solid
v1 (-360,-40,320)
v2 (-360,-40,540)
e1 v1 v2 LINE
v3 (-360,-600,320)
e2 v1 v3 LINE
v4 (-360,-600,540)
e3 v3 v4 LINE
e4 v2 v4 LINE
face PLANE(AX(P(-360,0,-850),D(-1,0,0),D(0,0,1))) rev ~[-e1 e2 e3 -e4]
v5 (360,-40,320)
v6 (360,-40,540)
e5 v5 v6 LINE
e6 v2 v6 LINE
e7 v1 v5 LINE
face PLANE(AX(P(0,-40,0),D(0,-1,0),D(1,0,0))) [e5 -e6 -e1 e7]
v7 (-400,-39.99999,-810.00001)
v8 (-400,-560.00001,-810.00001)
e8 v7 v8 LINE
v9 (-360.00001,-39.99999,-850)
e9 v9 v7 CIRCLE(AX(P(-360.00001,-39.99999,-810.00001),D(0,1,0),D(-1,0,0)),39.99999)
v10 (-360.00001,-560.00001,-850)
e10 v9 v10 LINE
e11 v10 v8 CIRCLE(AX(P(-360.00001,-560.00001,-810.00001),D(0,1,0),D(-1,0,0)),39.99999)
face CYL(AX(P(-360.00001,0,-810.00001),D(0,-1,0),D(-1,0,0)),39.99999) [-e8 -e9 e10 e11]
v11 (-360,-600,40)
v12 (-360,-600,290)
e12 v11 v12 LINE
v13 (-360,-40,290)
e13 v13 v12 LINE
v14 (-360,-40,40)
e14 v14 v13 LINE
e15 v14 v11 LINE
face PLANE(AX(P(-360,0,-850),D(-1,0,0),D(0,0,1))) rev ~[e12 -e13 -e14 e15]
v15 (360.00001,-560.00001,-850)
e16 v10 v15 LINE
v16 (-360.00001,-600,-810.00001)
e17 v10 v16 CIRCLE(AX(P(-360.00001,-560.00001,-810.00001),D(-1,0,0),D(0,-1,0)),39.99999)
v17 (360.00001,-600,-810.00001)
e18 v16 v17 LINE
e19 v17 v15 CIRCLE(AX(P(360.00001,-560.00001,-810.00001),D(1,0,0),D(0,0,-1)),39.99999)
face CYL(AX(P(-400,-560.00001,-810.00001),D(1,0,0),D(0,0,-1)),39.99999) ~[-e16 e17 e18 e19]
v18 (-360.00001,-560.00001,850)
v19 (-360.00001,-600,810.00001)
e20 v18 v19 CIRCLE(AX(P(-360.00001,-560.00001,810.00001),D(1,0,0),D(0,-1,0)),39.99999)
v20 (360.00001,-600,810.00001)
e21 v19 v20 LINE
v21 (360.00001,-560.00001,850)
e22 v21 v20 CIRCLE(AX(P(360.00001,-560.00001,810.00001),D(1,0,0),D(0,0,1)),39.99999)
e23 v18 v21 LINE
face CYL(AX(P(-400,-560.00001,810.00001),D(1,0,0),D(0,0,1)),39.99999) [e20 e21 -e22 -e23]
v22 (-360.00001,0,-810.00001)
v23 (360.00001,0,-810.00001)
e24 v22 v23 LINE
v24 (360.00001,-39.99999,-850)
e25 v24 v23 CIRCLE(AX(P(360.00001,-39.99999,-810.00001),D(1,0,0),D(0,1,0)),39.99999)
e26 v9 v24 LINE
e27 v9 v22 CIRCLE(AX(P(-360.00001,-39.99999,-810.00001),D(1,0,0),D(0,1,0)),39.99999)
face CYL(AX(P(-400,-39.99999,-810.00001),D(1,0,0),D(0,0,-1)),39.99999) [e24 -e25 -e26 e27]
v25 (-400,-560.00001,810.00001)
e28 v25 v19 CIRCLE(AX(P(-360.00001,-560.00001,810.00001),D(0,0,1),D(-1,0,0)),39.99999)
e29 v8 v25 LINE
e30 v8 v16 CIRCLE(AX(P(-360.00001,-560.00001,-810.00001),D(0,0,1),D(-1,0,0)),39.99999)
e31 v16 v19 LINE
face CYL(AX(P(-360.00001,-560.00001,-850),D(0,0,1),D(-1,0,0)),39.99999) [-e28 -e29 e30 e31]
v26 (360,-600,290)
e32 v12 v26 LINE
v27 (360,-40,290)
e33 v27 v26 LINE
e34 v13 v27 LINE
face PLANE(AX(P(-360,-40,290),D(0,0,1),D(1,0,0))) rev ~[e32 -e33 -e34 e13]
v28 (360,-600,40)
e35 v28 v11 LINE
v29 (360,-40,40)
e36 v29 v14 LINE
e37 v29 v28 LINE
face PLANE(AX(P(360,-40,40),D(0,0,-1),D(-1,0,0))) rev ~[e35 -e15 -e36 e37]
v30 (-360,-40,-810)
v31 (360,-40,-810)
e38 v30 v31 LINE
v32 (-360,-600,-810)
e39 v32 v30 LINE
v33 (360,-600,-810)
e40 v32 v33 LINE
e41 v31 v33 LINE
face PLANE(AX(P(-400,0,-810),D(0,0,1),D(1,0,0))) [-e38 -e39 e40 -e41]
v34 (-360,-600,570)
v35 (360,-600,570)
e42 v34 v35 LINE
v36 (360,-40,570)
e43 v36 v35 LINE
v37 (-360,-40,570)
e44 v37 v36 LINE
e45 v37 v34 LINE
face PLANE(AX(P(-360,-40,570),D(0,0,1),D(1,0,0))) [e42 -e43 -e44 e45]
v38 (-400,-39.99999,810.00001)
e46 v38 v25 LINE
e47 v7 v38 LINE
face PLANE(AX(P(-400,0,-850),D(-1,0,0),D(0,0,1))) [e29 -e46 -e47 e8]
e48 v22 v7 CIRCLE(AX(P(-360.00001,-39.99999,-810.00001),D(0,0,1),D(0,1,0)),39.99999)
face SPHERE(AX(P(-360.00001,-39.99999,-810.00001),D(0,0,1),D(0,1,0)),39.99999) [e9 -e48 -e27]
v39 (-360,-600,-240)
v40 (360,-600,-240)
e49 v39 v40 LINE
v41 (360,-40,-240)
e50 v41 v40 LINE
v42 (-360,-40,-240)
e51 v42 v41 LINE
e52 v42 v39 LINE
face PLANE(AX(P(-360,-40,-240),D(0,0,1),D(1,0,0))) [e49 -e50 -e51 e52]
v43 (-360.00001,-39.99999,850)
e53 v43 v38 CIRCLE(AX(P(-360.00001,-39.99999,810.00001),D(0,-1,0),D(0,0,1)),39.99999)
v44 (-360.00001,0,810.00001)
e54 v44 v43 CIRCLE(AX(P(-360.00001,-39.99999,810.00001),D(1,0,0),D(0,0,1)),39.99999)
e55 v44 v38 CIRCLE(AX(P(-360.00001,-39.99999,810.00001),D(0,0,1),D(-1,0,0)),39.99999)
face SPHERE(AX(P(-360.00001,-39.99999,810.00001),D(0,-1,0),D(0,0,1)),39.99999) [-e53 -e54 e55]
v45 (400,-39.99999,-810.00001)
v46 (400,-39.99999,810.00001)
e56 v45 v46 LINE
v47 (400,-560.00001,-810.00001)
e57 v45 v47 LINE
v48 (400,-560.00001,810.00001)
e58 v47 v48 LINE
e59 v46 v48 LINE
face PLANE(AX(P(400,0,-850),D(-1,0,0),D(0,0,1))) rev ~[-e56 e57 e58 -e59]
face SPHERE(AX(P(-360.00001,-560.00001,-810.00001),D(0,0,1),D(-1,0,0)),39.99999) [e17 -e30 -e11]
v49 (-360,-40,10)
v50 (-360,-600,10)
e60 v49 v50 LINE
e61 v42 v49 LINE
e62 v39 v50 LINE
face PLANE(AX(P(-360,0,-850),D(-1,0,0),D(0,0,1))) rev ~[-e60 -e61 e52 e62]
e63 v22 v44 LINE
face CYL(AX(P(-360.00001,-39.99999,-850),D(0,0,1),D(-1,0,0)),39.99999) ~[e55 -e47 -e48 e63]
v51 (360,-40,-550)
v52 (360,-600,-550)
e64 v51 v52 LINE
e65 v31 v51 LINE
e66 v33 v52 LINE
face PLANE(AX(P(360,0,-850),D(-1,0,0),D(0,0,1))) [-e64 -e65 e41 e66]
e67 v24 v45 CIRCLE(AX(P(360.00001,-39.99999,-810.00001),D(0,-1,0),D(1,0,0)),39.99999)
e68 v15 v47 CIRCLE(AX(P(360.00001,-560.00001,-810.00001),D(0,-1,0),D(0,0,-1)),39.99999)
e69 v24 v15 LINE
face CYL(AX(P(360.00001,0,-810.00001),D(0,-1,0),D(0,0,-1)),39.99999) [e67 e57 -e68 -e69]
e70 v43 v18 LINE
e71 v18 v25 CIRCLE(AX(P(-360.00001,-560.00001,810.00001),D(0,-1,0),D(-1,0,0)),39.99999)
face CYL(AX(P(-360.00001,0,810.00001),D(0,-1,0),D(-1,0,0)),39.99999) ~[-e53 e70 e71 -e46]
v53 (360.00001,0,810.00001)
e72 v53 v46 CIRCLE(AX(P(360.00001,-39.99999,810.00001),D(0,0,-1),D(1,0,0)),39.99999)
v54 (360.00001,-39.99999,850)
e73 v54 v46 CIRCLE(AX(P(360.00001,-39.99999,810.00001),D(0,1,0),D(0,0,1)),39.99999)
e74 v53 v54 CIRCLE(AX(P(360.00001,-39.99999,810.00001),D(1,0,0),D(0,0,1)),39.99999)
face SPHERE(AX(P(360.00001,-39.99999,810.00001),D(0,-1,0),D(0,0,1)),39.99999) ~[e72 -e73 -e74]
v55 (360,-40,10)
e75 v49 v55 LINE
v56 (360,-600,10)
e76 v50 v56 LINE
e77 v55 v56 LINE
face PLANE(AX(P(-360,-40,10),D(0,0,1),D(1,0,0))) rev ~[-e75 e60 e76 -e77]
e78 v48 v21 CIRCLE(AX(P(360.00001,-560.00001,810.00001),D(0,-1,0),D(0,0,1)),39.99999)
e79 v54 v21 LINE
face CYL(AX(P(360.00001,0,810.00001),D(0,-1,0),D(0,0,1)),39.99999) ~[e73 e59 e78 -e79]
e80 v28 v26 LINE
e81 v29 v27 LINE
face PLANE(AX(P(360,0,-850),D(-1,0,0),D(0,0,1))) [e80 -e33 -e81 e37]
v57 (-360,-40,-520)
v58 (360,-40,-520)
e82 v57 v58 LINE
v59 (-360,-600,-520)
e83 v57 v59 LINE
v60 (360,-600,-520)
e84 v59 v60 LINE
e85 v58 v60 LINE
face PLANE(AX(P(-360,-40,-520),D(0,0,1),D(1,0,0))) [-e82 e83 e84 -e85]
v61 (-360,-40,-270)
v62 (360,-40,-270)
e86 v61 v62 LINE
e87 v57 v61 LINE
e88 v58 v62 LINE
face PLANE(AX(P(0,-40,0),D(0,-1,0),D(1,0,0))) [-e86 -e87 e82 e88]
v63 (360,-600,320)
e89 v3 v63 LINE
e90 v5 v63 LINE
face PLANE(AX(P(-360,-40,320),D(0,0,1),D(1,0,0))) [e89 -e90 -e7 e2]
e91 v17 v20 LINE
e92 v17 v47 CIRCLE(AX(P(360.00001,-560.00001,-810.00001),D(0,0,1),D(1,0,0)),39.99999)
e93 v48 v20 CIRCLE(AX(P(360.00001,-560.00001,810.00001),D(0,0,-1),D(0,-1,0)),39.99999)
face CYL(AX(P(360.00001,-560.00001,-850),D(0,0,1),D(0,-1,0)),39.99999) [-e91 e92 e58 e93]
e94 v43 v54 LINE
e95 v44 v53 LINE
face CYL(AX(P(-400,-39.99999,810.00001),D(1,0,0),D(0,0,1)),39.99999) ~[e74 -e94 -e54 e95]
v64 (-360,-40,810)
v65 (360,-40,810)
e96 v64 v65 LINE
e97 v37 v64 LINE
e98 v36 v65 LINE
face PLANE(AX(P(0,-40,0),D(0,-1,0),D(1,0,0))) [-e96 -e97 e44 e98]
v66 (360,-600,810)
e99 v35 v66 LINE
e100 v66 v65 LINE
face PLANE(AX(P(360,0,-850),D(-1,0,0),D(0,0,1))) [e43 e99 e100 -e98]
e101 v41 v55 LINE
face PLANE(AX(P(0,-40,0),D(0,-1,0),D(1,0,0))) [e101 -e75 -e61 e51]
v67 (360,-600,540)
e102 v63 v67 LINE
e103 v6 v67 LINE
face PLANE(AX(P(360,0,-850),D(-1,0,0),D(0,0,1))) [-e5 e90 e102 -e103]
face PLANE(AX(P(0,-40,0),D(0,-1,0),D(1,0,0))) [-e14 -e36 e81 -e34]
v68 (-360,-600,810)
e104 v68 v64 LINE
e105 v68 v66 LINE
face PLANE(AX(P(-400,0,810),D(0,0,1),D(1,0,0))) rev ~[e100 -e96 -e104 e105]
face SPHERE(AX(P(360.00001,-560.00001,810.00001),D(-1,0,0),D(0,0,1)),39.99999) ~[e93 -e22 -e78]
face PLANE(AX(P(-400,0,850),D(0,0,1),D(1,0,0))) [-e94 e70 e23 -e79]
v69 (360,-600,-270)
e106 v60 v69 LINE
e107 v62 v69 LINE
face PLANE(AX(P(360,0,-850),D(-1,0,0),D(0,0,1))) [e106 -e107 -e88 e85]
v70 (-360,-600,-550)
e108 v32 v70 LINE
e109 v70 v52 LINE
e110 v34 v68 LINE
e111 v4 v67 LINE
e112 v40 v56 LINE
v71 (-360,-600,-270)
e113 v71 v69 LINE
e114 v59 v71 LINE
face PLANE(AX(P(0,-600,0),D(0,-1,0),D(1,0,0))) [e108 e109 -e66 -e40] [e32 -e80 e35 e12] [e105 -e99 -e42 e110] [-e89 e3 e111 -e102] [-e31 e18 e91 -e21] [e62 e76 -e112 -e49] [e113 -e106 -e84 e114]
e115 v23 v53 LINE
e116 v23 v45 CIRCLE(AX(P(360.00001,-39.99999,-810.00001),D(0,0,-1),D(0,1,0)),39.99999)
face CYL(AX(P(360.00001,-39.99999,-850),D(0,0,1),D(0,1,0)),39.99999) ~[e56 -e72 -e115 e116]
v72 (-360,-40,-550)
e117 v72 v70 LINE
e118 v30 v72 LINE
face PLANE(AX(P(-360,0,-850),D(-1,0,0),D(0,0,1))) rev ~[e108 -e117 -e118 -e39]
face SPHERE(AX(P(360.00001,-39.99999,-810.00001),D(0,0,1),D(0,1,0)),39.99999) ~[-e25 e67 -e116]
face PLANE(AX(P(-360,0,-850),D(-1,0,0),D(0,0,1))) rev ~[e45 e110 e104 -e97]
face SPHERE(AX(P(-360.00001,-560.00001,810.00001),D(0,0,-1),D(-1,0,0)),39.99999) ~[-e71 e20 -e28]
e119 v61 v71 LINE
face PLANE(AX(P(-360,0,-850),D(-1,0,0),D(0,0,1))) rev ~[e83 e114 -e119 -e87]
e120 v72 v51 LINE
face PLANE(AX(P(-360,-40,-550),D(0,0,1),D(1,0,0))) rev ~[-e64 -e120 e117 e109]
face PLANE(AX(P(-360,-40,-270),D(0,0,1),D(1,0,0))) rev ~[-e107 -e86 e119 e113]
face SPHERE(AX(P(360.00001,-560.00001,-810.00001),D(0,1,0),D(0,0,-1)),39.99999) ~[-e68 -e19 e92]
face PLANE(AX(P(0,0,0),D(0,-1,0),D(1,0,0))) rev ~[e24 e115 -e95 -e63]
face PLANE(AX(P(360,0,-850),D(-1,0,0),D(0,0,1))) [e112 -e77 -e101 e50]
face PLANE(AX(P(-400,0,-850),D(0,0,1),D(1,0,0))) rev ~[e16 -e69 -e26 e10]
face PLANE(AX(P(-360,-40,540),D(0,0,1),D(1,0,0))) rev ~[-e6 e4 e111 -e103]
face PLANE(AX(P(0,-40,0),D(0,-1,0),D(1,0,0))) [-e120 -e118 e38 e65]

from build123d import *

# Parameters (mm, degrees)
F0_W      = 800
F0_H      = 1700
F1_DEPTH  = 600
F2_T      = -40
F3_W      = 720
F3_H      = 30
F4_DEPTH  = 560
F5_R      = 39.99999
F7_DEPTH  = 560
F8_W      = 720
F8_H      = 30
F9_DEPTH  = 560
F10_W     = 720
F10_H     = 30
F11_DEPTH = 560


# Not quite as in the source:
# - a fillet or chamfer is up to 0.001 mm smaller than in the source, because OpenCascade refuses the exact size


with BuildPart() as f1:
    # F0 (on Front) → F1 (new body)
    with BuildSketch(Plane.XZ):
        Rectangle(F0_W, F0_H)
    extrude(amount=F1_DEPTH)

    # F2
    f2_openings = [f1.faces().sort_by_distance(p)[0] for p in [
        (0, -600, 0),
    ]]
    offset(amount=F2_T, openings=f2_openings)

    # F3 (on face) → F4 (join)
    with BuildSketch(Plane.XZ.offset(40)):
        with Locations((0, -255)):
            Rectangle(F3_W, F3_H)
    extrude(amount=F4_DEPTH)

    # F5 (radius 40 in the source; OpenCascade refuses exactly that, so slightly less here)
    f5_edges = [f1.edges().sort_by_distance(p)[0] for p in [
        (-400, -600, 0),
        (-400, -300, 850),
        (0, -600, 850),
        (400, -300, 850),
        (0, 0, 850),
        (-400, 0, 0),
        (400, 0, 0),
        (0, 0, -850),
        (-400, -300, -850),
        (400, -300, -850),
        (0, -600, -850),
        (400, -600, 0),
    ]]
    fillet(f5_edges, radius=F5_R)

    # F6 (on face) → F7 (join)
    with BuildSketch(Plane.XZ.offset(40)):
        Polygon((360, 40), (-360, 40), (-360, 20.5096974969), (-360, 10), (360, 10), align=None)
    extrude(amount=F7_DEPTH)

    # F8 (on face) → F9 (join)
    with BuildSketch(Plane.XZ.offset(40)):
        with Locations((0, -535)):
            Rectangle(F8_W, F8_H)
    extrude(amount=F9_DEPTH)

    # F10 (on face) → F11 (join)
    with BuildSketch(Plane.XZ.offset(40)):
        with Locations((0, 305)):
            Rectangle(F10_W, F10_H)
        with Locations((0, 555)):
            Rectangle(F10_W, F10_H)
    extrude(amount=F11_DEPTH)


solid = f1.part
